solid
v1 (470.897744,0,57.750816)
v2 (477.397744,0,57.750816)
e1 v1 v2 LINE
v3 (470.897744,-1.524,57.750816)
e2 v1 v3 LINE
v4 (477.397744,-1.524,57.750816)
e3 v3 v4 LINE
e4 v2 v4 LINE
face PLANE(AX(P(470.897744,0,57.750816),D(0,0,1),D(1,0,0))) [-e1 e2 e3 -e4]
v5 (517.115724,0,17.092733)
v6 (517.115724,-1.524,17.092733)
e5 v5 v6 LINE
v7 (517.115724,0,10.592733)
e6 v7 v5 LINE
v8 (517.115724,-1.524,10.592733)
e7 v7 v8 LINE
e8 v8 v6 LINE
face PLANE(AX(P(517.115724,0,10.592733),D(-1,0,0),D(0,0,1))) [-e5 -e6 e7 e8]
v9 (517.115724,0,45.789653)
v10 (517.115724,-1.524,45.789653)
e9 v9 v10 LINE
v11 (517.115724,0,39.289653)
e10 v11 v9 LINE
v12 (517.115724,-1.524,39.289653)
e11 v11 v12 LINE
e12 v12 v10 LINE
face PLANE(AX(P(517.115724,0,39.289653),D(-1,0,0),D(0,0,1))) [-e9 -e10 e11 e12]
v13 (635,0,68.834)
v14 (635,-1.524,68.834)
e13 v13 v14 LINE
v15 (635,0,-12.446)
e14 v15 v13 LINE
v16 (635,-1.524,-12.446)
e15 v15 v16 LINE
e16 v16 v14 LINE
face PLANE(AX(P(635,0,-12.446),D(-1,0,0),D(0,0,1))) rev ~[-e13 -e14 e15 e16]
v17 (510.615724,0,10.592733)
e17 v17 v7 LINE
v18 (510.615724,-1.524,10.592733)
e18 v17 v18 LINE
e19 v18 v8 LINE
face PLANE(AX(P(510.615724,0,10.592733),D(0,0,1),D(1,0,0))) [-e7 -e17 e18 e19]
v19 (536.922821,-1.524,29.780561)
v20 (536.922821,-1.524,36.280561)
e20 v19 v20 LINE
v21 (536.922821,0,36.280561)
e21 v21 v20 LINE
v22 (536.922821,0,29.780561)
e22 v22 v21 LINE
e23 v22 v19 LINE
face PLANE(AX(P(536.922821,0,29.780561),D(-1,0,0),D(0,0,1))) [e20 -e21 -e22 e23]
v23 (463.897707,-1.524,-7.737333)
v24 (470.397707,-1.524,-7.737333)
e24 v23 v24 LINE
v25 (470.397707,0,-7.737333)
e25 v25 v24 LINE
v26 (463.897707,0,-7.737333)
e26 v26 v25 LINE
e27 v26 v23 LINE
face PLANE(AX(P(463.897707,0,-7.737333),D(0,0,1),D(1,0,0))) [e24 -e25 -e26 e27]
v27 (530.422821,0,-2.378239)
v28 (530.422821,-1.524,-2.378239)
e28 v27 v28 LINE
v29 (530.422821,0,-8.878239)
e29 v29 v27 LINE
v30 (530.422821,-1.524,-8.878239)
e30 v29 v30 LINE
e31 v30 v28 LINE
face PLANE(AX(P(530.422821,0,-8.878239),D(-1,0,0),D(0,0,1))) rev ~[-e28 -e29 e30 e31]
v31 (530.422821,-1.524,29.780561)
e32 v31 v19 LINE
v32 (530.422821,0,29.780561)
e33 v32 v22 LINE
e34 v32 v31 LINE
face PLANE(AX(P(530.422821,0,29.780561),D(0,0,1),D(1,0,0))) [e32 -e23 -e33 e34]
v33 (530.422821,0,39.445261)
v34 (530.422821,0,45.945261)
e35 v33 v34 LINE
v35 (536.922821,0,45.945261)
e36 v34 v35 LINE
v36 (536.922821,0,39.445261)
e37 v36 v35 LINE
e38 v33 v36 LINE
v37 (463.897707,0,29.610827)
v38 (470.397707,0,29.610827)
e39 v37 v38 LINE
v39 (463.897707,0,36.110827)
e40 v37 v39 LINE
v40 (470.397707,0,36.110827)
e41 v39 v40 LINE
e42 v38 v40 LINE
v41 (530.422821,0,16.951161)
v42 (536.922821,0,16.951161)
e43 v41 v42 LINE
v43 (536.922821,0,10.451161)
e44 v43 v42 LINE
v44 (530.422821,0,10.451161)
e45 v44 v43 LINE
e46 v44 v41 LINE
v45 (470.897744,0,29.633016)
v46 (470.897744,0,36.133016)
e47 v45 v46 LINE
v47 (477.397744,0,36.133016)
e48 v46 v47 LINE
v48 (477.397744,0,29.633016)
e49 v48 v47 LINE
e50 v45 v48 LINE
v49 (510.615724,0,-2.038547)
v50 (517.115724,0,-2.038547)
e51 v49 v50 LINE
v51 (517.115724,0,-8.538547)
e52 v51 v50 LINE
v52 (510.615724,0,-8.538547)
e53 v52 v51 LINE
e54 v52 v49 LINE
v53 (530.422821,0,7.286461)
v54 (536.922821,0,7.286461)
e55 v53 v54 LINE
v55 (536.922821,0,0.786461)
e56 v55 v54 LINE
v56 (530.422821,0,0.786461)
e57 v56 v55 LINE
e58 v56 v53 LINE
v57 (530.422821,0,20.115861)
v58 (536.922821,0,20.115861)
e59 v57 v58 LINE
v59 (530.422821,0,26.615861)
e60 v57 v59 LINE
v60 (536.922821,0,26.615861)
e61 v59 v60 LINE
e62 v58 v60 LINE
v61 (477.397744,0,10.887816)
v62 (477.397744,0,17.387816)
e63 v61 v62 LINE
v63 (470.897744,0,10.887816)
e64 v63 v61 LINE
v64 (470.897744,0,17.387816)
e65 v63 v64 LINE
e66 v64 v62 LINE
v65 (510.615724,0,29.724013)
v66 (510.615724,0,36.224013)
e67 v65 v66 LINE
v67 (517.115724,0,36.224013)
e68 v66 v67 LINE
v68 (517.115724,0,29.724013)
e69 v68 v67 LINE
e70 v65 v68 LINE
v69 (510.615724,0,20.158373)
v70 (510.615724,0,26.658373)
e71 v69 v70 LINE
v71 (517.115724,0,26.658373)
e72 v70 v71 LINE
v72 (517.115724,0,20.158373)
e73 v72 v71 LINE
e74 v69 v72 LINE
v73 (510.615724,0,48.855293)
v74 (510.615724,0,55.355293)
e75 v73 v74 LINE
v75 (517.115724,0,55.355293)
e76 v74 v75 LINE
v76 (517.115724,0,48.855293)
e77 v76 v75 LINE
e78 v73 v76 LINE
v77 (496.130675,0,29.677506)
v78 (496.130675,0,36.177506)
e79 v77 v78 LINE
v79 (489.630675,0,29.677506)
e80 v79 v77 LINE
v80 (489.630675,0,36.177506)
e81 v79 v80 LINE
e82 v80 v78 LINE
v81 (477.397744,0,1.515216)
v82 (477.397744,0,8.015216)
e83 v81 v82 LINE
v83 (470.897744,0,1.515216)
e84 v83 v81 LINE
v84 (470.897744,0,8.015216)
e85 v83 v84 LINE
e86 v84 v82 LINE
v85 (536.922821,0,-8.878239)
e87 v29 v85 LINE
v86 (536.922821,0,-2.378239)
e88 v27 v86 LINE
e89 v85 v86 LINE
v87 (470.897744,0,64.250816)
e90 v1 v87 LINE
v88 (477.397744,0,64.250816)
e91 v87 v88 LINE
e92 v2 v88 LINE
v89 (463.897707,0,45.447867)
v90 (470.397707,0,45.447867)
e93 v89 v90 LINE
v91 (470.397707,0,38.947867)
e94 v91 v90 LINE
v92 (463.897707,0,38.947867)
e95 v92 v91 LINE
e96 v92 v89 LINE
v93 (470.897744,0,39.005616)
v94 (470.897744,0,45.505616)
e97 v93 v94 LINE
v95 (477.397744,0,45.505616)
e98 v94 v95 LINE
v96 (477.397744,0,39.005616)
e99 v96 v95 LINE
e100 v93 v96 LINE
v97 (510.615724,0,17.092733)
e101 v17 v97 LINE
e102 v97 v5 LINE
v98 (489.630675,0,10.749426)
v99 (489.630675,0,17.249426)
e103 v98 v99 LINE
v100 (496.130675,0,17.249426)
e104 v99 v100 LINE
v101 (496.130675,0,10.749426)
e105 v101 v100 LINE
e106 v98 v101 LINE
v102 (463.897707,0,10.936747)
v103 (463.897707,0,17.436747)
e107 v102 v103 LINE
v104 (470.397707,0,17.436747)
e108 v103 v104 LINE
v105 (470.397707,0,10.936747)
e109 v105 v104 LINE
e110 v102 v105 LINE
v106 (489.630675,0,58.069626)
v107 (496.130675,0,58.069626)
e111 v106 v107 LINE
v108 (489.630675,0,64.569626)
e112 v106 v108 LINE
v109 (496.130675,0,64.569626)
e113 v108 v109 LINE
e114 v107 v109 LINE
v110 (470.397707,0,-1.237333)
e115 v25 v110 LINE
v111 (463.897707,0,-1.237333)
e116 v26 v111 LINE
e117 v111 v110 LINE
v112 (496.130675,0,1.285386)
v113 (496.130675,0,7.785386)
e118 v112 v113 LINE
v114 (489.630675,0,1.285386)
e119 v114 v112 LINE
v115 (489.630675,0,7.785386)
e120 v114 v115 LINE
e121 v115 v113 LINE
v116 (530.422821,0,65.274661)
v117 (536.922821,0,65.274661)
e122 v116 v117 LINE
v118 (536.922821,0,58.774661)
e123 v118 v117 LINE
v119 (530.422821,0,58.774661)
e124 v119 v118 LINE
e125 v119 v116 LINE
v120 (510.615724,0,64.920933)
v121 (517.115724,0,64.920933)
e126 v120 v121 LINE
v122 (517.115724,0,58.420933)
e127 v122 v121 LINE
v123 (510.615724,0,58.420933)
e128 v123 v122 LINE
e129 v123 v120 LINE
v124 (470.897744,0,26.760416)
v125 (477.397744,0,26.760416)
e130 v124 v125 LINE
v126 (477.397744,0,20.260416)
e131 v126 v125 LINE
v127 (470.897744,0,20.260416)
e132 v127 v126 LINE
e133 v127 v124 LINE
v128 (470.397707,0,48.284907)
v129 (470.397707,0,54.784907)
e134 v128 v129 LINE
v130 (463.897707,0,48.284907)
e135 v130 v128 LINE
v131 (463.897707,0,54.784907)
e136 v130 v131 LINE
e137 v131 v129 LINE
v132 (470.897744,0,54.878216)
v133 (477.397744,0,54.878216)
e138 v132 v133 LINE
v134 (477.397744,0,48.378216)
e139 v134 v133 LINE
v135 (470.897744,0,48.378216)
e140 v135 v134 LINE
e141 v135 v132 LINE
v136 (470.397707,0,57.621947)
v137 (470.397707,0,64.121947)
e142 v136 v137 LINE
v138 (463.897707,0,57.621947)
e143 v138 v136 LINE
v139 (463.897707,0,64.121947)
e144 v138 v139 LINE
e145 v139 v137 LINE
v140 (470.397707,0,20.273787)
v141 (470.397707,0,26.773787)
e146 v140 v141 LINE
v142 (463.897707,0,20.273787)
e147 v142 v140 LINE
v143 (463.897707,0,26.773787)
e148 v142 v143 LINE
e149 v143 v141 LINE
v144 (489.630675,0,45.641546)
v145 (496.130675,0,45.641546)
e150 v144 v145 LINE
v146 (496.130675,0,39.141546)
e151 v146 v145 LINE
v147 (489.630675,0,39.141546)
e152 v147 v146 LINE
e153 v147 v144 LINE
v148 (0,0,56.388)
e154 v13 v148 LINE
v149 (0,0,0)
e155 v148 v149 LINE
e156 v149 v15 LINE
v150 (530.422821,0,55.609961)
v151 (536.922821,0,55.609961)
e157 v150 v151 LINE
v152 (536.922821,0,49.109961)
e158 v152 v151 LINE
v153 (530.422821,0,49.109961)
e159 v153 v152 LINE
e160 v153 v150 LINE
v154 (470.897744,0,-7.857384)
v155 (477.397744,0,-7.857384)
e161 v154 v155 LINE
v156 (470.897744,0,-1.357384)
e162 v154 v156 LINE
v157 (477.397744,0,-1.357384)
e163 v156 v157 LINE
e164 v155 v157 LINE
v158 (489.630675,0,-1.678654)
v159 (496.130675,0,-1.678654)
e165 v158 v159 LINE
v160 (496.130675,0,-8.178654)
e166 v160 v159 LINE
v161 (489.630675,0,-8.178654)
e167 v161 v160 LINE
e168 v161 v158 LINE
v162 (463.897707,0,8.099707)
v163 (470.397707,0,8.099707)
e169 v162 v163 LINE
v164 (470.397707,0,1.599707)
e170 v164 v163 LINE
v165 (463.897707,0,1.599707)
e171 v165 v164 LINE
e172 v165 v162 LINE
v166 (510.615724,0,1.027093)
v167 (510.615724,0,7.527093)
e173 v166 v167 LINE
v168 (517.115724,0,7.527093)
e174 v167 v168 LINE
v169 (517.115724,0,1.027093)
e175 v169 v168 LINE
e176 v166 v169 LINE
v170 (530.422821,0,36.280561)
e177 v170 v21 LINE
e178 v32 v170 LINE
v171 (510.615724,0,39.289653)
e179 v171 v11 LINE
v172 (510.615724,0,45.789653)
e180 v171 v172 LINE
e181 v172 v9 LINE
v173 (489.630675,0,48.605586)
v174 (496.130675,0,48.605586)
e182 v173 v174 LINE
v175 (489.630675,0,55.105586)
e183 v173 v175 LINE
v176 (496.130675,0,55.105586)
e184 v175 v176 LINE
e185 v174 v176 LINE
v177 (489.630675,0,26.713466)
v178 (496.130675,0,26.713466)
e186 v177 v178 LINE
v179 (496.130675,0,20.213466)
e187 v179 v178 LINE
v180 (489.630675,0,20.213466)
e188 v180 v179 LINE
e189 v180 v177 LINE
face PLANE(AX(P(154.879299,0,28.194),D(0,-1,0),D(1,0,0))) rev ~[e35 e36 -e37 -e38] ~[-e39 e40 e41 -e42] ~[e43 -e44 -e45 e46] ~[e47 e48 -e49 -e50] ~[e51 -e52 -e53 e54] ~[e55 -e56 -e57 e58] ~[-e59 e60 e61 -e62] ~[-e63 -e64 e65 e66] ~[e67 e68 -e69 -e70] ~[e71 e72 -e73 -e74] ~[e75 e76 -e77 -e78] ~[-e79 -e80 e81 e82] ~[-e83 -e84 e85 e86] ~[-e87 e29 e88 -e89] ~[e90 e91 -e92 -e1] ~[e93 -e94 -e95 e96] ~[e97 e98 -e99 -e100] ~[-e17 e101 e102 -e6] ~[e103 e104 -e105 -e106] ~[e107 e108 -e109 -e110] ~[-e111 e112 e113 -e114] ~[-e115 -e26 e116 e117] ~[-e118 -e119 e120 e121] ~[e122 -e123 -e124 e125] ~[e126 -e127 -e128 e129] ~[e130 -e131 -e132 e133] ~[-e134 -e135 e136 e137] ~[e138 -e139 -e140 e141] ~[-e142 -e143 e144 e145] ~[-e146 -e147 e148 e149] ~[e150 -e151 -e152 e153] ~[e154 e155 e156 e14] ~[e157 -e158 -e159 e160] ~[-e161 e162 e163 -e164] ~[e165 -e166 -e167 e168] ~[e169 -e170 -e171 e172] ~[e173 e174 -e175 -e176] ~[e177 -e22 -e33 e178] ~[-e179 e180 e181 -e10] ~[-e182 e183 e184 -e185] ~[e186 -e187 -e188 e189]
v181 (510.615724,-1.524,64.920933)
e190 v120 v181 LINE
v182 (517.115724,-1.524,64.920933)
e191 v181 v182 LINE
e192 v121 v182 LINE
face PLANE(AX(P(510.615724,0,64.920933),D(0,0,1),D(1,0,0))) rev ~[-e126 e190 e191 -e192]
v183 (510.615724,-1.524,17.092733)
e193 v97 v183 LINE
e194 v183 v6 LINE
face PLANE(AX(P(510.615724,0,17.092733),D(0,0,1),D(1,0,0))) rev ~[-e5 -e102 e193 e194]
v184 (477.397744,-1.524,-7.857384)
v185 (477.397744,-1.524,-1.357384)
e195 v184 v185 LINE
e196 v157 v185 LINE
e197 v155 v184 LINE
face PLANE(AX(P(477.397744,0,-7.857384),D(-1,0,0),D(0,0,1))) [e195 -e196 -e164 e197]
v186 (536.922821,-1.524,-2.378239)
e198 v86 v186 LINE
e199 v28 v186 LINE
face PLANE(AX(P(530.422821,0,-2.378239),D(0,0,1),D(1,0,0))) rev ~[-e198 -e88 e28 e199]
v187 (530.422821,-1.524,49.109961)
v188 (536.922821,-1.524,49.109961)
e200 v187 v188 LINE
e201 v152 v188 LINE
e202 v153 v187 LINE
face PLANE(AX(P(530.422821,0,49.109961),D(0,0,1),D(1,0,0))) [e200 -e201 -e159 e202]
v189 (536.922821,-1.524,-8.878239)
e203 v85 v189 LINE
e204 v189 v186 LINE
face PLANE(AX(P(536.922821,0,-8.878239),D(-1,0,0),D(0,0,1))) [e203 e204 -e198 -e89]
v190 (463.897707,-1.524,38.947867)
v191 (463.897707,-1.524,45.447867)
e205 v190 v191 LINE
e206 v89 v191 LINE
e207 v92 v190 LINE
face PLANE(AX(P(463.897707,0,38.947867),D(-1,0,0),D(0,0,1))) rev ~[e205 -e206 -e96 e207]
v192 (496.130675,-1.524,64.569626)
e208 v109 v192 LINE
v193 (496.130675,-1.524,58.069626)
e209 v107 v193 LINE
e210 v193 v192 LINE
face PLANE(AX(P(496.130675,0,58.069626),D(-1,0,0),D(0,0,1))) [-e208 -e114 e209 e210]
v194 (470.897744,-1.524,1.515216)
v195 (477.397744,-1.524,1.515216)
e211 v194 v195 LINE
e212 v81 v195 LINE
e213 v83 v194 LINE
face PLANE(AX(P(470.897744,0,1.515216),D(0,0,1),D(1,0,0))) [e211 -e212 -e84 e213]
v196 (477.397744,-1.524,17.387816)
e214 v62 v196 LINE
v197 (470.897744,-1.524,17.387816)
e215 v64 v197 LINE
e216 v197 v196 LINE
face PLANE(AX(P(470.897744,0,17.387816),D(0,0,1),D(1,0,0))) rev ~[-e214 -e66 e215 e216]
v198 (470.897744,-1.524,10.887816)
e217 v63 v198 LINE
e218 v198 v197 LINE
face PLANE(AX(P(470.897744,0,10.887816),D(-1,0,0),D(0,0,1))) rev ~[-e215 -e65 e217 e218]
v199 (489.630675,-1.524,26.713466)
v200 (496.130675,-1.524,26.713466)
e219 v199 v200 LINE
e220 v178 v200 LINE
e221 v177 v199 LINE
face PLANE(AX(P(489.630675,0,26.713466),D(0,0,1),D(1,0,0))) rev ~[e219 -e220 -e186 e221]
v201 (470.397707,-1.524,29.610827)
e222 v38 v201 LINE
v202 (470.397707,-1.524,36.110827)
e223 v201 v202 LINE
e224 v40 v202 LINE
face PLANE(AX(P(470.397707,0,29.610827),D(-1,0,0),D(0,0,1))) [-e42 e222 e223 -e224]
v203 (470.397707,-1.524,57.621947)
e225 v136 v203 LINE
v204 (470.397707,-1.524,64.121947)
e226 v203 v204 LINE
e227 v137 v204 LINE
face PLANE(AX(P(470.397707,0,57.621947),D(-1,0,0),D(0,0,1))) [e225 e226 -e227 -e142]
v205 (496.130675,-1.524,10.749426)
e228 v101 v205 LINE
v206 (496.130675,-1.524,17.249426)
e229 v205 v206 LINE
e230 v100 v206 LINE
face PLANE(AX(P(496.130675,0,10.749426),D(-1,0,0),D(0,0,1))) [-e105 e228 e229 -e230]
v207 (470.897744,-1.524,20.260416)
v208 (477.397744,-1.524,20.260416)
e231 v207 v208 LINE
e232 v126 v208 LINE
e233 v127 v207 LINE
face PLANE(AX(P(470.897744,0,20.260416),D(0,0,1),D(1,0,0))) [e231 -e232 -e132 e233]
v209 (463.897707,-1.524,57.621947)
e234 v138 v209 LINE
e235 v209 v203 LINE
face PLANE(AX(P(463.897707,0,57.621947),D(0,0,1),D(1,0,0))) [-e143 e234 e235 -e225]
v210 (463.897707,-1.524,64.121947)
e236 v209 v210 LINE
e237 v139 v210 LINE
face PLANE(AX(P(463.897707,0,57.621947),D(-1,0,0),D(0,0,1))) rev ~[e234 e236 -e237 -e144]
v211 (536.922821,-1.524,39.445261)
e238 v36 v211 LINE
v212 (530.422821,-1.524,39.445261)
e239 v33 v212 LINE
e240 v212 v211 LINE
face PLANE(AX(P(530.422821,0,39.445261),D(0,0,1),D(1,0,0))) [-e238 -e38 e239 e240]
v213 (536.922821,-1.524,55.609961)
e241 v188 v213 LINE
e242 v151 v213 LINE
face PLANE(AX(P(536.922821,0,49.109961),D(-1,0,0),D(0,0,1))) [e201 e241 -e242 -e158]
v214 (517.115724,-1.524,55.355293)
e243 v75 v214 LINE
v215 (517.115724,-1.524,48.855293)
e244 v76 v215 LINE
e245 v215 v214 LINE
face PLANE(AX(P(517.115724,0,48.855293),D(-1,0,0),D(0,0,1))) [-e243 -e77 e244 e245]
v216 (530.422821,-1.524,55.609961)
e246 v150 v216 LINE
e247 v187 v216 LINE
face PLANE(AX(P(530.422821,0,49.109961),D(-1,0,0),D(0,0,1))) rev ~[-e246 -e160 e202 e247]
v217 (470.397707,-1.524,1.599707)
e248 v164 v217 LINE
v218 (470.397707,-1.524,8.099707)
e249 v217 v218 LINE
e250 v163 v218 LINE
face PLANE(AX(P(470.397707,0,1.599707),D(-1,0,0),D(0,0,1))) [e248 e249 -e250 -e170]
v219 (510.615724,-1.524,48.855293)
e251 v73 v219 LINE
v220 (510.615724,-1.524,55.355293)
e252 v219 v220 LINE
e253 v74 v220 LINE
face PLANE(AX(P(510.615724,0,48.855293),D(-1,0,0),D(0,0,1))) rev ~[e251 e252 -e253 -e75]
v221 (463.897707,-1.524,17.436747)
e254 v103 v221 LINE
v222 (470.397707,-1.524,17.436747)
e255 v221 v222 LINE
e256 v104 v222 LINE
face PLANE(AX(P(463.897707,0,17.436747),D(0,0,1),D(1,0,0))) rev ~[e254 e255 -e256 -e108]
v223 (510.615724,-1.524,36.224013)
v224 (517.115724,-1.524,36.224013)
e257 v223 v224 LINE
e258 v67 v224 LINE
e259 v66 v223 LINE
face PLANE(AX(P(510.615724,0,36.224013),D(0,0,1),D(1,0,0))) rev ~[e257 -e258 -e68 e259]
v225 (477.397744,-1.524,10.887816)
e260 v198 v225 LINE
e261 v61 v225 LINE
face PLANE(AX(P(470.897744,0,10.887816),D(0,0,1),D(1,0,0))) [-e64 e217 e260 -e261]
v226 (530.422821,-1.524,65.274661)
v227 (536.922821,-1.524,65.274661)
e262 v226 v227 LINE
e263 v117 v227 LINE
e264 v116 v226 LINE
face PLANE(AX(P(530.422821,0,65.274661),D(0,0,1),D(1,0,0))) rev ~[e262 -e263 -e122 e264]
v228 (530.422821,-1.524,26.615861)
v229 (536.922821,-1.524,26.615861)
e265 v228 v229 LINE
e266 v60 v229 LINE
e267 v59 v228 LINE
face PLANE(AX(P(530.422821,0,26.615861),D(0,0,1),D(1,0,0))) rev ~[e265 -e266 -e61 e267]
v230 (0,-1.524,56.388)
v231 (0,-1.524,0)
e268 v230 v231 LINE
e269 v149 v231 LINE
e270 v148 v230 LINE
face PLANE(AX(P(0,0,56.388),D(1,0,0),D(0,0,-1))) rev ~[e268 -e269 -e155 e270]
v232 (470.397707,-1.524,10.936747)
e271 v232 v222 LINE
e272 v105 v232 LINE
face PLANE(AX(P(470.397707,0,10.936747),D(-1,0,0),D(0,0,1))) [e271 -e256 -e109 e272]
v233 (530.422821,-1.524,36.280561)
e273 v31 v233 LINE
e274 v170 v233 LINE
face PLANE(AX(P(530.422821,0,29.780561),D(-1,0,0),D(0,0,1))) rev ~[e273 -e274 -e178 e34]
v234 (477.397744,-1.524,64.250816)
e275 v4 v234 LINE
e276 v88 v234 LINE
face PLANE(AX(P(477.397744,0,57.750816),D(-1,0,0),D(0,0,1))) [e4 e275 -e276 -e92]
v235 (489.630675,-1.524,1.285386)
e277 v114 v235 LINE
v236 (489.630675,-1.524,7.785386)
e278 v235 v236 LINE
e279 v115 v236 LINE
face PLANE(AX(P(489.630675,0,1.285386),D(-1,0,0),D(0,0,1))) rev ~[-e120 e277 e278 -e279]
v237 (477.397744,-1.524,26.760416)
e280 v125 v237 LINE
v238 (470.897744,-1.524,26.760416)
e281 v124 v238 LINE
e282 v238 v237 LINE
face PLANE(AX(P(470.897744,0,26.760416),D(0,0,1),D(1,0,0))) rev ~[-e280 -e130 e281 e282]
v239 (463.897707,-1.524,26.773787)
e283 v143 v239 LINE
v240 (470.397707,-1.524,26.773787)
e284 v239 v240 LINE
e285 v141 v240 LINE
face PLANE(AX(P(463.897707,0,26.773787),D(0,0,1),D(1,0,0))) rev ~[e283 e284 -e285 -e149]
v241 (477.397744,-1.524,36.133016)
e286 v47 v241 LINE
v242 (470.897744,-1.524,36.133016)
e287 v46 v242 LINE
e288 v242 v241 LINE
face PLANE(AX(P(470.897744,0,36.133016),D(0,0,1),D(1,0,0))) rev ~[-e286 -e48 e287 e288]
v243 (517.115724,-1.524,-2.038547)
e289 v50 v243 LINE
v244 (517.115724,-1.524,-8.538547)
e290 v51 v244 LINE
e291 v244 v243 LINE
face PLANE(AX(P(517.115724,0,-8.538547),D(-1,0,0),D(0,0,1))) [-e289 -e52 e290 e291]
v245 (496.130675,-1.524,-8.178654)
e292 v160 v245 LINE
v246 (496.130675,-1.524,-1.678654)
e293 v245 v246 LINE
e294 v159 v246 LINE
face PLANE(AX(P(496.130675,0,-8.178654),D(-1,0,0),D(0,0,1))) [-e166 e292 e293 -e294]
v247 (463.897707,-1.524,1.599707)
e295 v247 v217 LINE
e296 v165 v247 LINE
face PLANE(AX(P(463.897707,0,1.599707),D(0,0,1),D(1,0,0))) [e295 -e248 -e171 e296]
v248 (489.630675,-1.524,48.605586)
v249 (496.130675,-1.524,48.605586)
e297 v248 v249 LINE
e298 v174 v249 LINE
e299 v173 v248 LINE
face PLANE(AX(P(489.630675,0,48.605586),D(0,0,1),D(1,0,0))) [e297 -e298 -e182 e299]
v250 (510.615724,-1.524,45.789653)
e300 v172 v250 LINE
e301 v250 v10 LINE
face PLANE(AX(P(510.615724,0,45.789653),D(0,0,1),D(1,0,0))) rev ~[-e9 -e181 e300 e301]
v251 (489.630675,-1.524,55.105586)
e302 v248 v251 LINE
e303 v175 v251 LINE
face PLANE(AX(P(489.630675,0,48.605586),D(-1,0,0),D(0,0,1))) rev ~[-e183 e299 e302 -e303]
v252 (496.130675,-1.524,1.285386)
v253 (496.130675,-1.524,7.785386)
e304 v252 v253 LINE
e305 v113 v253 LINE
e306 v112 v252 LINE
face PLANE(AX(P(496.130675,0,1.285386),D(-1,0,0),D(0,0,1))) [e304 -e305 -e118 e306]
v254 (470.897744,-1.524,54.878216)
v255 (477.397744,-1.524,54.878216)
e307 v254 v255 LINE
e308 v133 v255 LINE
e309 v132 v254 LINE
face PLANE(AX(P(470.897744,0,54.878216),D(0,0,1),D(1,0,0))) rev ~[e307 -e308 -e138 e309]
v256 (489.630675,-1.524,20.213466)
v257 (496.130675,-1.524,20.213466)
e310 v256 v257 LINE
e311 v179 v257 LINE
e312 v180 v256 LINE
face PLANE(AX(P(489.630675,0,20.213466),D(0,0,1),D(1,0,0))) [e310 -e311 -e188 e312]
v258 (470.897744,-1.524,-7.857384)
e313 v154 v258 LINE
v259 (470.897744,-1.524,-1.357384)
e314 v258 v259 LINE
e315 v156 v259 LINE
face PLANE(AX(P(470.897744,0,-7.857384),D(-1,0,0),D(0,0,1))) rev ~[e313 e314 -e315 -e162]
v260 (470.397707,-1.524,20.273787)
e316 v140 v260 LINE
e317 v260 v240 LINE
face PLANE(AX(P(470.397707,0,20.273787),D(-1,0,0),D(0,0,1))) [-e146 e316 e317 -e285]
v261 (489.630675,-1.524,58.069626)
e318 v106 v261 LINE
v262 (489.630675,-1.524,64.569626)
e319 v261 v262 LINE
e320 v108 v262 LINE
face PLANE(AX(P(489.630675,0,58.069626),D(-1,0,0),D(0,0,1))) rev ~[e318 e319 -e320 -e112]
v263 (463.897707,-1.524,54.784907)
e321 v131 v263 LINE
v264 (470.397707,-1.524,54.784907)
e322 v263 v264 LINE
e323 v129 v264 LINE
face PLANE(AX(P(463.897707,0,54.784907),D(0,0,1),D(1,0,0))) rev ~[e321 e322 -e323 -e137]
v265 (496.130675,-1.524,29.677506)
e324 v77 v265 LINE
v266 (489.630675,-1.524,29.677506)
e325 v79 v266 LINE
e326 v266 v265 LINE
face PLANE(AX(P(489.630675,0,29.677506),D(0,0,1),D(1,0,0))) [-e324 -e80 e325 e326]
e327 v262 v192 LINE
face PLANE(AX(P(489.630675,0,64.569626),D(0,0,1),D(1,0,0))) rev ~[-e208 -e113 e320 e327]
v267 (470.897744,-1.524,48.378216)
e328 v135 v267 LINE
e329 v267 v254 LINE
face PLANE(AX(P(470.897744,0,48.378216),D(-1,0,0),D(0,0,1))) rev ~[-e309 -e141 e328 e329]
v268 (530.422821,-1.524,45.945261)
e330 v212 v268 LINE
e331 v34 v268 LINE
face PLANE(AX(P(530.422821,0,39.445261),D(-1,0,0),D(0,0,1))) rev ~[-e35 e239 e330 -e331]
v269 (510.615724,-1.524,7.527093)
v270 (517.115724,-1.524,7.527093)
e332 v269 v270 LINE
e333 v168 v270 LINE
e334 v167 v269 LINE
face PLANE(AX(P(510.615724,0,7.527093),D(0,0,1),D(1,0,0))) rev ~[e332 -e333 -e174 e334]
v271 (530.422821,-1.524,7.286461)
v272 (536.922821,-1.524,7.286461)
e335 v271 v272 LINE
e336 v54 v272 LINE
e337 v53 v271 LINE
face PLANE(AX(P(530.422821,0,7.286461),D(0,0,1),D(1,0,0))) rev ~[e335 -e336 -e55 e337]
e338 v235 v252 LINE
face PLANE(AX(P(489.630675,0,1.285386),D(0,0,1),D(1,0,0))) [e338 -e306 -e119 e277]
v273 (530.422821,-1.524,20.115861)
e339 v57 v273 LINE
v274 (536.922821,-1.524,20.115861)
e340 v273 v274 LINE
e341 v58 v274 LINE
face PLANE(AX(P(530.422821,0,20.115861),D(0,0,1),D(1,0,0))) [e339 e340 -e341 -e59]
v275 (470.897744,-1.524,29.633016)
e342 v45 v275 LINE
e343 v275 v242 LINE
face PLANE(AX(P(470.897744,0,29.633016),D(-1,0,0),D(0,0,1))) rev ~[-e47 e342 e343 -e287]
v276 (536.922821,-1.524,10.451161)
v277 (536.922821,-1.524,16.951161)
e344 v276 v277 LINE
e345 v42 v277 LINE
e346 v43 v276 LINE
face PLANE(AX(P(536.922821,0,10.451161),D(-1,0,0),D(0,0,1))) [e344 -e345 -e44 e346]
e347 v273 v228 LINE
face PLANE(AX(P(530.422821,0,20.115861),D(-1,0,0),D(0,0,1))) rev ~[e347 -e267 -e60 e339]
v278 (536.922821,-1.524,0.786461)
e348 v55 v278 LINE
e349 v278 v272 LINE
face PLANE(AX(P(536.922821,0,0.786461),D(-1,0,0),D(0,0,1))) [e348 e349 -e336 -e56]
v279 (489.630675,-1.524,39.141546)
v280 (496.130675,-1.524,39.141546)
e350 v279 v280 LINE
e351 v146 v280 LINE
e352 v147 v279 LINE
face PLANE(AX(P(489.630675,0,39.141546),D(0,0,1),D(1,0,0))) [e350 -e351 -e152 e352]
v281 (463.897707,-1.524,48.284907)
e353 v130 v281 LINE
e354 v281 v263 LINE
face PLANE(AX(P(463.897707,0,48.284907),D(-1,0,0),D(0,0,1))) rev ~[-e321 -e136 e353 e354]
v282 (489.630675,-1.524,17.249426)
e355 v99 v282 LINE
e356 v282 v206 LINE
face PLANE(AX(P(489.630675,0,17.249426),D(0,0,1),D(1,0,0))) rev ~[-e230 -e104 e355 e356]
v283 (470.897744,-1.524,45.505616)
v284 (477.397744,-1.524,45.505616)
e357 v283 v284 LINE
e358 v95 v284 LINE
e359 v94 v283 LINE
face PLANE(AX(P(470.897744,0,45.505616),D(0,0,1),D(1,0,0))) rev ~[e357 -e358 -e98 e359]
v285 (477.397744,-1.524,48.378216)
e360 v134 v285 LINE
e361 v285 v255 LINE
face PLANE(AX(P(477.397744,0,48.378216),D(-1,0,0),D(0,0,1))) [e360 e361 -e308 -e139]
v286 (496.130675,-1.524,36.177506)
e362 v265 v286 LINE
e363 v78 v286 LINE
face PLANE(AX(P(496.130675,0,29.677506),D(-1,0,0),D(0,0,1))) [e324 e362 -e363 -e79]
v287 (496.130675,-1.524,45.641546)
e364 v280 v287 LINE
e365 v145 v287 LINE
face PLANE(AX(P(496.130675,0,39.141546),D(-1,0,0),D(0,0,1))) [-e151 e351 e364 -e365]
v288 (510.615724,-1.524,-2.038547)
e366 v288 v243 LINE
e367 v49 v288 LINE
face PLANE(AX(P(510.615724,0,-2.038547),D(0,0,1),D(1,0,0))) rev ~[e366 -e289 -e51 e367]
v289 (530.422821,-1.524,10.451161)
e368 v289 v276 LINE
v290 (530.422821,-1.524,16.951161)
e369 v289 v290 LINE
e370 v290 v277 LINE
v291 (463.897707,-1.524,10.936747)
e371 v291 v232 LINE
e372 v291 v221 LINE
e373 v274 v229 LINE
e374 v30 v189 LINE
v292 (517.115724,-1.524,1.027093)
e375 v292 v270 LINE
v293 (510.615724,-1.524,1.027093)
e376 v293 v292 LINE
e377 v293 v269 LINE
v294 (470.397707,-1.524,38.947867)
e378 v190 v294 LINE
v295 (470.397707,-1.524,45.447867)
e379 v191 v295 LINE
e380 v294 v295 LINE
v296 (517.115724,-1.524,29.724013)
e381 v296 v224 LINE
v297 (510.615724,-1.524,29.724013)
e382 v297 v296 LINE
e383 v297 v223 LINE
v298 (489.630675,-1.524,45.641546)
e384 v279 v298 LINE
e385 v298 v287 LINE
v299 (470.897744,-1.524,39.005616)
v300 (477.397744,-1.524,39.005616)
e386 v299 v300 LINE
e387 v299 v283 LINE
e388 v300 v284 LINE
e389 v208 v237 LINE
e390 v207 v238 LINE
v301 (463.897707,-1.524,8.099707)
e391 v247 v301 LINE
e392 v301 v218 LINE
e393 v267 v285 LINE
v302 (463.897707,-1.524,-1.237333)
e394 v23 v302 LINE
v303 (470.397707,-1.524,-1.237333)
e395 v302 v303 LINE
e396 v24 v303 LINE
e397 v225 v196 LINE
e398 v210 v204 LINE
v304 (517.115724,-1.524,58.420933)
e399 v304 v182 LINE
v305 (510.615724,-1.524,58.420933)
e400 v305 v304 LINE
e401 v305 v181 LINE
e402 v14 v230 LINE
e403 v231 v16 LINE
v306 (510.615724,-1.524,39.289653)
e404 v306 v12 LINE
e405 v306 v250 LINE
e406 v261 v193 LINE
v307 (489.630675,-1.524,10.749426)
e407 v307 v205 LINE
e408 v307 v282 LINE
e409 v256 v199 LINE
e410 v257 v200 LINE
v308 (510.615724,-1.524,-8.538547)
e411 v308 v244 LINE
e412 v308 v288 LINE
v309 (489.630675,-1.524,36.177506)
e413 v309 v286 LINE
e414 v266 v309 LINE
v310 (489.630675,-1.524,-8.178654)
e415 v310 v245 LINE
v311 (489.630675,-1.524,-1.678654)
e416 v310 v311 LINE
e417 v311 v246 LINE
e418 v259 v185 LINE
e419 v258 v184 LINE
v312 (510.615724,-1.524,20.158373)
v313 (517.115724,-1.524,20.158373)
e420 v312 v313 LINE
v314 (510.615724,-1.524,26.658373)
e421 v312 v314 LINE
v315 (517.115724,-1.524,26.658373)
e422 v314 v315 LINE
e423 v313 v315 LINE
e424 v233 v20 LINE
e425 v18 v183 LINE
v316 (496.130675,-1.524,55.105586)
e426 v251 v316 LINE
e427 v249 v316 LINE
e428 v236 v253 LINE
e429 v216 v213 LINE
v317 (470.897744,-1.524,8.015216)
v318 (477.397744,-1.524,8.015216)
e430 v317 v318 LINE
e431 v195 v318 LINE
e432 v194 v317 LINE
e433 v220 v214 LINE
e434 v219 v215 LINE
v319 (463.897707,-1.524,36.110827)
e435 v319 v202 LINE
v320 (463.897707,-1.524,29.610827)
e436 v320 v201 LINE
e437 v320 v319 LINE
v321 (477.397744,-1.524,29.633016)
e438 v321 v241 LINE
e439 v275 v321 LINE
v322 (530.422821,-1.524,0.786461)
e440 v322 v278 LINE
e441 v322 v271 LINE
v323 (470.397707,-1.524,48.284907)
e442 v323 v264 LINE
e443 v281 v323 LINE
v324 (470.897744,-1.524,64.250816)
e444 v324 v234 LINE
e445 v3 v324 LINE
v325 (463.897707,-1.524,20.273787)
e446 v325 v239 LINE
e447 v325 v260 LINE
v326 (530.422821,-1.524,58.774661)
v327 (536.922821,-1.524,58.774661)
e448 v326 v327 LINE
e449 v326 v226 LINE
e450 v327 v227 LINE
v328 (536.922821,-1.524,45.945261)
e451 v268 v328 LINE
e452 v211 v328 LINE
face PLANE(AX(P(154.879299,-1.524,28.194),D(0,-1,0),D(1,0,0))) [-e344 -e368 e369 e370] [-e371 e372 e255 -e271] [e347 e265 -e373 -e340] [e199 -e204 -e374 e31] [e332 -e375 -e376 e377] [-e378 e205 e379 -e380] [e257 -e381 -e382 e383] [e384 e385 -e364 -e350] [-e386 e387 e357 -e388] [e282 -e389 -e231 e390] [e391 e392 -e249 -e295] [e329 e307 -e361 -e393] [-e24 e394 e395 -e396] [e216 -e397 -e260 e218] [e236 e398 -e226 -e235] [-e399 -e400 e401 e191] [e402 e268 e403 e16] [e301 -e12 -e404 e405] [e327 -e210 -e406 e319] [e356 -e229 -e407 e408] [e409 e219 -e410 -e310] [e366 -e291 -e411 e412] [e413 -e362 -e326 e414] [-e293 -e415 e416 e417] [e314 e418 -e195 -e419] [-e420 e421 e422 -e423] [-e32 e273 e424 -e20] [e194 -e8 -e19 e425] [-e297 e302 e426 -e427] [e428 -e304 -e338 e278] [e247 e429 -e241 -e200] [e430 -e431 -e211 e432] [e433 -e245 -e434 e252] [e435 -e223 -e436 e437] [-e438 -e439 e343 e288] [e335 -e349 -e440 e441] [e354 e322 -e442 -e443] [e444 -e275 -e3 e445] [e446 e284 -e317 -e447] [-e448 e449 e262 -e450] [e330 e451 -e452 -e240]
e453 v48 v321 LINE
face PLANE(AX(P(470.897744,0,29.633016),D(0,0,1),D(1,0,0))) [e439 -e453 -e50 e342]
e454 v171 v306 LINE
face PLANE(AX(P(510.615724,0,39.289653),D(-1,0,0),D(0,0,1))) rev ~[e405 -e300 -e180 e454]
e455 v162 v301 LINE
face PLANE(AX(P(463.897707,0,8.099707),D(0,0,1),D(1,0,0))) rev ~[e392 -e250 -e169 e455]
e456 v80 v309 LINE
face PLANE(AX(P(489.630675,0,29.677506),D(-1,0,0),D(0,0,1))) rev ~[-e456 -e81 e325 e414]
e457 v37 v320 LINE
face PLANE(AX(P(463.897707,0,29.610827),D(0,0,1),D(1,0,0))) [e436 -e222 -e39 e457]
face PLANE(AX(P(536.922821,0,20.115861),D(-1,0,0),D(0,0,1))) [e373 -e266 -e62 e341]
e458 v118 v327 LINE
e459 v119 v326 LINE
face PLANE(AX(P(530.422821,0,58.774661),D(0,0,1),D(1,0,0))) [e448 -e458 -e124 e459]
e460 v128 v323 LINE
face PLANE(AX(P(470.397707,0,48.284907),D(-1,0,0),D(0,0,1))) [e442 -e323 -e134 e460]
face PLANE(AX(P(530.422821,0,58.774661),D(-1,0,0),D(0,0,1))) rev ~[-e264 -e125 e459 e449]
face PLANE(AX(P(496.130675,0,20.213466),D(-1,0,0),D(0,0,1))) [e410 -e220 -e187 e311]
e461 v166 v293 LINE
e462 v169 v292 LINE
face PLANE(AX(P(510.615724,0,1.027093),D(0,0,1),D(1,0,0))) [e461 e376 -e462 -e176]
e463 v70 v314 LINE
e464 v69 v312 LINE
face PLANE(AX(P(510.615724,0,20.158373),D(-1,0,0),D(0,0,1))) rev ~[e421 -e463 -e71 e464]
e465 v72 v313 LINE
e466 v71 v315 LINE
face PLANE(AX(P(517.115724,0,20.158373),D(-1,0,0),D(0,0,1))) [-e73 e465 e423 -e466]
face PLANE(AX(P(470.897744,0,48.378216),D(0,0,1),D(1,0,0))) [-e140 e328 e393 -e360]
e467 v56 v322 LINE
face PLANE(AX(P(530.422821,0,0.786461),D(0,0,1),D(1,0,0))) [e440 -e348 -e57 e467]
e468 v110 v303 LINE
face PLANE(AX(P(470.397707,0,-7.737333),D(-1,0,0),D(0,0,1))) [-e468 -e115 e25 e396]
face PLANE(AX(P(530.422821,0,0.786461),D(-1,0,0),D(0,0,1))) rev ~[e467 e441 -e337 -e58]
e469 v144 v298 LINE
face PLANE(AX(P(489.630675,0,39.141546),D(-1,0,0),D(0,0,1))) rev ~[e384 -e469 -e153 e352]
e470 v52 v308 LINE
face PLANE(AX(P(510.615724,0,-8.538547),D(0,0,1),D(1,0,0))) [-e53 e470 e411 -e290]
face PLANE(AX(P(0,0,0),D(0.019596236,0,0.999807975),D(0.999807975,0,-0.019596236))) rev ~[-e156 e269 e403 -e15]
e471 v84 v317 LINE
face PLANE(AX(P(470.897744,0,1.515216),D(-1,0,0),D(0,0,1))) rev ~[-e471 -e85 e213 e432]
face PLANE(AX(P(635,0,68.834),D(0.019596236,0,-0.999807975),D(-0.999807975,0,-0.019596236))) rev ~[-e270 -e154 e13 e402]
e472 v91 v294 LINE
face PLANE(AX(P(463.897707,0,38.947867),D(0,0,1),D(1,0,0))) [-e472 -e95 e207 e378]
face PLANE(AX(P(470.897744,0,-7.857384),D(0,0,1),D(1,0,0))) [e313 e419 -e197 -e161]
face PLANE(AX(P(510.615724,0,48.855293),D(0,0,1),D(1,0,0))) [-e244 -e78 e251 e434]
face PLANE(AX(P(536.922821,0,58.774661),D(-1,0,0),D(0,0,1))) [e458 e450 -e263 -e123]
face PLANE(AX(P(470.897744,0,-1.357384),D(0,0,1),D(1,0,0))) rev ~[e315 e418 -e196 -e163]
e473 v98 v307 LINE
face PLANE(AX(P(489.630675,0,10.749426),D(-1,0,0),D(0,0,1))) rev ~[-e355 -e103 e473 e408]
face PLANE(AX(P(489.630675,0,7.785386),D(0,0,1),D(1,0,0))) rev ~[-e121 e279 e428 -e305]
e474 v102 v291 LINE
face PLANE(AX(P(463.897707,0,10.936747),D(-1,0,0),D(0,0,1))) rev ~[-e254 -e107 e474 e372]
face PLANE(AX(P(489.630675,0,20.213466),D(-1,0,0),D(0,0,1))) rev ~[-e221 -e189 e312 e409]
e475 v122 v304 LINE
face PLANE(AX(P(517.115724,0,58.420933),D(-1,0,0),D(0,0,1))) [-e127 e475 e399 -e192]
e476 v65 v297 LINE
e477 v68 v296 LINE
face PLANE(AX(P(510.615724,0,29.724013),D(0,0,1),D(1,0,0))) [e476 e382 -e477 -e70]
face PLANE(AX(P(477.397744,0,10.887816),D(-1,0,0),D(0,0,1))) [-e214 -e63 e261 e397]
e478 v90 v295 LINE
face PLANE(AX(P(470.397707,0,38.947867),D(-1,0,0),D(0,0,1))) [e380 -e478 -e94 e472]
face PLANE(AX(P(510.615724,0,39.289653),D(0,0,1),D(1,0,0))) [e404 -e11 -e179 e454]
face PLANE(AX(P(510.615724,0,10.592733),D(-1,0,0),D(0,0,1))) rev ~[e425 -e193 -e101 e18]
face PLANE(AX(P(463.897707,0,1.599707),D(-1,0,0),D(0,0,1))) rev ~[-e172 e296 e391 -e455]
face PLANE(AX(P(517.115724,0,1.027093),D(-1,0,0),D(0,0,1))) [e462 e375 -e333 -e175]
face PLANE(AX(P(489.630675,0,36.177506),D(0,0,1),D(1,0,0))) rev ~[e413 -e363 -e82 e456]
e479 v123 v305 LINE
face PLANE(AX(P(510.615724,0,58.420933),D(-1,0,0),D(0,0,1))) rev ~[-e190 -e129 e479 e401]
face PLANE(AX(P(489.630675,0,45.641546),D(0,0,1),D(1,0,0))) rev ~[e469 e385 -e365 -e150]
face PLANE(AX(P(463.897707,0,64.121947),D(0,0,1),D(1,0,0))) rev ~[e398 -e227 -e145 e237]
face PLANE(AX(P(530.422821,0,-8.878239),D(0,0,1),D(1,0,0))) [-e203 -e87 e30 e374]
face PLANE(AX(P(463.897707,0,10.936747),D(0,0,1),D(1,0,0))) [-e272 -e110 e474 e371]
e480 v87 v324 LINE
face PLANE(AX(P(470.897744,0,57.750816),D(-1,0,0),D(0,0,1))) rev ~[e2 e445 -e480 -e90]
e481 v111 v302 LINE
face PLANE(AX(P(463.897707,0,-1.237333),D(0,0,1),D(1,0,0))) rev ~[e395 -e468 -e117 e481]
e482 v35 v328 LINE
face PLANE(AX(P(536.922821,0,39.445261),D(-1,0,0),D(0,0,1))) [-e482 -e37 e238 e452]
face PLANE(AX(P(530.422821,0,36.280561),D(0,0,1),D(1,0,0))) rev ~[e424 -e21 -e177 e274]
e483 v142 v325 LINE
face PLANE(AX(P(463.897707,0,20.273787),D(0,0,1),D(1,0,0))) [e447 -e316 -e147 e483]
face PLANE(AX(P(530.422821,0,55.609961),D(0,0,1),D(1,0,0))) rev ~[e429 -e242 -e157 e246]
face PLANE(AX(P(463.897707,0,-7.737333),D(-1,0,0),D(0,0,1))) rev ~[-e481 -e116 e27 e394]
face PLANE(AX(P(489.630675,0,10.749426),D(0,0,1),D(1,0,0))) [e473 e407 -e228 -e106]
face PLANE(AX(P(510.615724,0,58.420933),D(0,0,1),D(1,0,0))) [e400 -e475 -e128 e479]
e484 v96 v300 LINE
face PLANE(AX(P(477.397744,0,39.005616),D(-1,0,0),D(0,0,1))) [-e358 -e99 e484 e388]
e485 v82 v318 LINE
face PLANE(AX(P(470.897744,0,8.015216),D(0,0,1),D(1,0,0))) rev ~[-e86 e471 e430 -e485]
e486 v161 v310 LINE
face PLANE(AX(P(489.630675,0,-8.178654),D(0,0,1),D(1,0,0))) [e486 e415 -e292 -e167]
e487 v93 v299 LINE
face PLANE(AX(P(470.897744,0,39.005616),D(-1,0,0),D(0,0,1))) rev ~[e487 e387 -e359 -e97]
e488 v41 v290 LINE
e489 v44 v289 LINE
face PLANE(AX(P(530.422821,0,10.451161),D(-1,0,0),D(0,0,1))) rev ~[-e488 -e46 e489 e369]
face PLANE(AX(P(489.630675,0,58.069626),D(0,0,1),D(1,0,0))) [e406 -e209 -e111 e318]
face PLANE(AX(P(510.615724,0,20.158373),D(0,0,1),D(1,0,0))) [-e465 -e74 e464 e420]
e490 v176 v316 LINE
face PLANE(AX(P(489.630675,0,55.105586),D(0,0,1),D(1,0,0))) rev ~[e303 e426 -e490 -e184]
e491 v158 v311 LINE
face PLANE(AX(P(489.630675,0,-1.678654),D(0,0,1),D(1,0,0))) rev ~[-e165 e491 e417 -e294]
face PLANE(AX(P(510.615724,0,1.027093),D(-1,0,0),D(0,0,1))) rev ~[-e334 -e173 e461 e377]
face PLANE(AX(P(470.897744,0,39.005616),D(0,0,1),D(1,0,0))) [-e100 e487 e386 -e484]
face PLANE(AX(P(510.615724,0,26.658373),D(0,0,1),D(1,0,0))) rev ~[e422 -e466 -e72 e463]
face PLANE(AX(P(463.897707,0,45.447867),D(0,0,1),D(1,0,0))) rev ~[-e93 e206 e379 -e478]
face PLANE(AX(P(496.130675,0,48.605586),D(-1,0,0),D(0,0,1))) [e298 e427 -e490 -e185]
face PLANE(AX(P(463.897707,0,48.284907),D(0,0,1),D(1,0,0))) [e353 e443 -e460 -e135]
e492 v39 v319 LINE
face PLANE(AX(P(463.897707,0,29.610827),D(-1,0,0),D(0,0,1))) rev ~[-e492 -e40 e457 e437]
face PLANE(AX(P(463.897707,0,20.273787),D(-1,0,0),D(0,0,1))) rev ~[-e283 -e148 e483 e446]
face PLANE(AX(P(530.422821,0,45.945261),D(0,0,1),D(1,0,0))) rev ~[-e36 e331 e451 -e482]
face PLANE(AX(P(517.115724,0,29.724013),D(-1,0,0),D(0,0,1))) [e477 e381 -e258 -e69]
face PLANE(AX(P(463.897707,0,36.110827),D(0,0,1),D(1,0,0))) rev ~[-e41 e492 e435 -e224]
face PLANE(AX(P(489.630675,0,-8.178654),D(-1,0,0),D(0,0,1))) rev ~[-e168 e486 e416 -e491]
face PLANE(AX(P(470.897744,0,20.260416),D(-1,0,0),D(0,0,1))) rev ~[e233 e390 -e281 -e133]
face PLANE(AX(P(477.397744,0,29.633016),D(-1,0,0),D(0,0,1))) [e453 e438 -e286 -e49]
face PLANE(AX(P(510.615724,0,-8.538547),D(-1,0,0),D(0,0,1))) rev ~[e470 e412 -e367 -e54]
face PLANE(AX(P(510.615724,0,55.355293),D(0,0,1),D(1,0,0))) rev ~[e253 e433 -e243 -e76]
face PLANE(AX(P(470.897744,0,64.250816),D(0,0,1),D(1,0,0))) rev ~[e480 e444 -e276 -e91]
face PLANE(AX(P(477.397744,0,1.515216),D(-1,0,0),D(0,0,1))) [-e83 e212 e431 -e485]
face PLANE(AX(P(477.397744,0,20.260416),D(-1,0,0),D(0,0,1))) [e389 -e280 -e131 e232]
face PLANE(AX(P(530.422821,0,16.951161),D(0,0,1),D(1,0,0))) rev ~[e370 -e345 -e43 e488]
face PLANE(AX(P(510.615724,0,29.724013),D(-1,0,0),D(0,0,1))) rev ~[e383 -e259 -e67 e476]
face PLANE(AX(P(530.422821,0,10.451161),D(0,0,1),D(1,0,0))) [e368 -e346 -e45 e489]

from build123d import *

# Parameters (mm, degrees)
F0_W     = 6.5
F0_H     = 6.5
F1_DEPTH = 1.524
F3_R     = 1.1303
F4_DEPTH = 972


# Not quite as in the source:
# - an extrude ends at something that could not be found from the text; its depth is read off the source's solid


with BuildPart() as f1:
    # F0 (on Front) → F1 (new body)
    with BuildSketch(Plane.XZ):
        Polygon((0, 56.388), (0, 0), (304.8, -5.97408), (304.8, 62.36208), align=None)
        Polygon((304.8, 62.36208), (304.8, -5.97408), (635, -12.446), (635, 68.834), align=None)
        with Locations((467.1477068, -4.4873331716)):
            Rectangle(F0_W, F0_H, mode=Mode.SUBTRACT)
        with Locations((474.1477436, -4.6073838027)):
            Rectangle(F0_W, F0_H, mode=Mode.SUBTRACT)
        with Locations((467.1477068, 4.8497068284)):
            Rectangle(F0_W, F0_H, mode=Mode.SUBTRACT)
        with Locations((474.1477436, 4.7652161973)):
            Rectangle(F0_W, F0_H, mode=Mode.SUBTRACT)
        with Locations((492.8806754, -4.9286535831)):
            Rectangle(F0_W, F0_H, mode=Mode.SUBTRACT)
        with Locations((513.8657236, -5.2885471597)):
            Rectangle(F0_W, F0_H, mode=Mode.SUBTRACT)
        with Locations((533.6728214, -5.628238887)):
            Rectangle(F0_W, F0_H, mode=Mode.SUBTRACT)
        with Locations((492.8806754, 4.5353864169)):
            Rectangle(F0_W, F0_H, mode=Mode.SUBTRACT)
        with Locations((513.8657236, 4.2770928403)):
            Rectangle(F0_W, F0_H, mode=Mode.SUBTRACT)
        with Locations((533.6728214, 4.036461113)):
            Rectangle(F0_W, F0_H, mode=Mode.SUBTRACT)
        with Locations((467.1477068, 14.1867468284)):
            Rectangle(F0_W, F0_H, mode=Mode.SUBTRACT)
        with Locations((474.1477436, 14.1378161973)):
            Rectangle(F0_W, F0_H, mode=Mode.SUBTRACT)
        with Locations((467.1477068, 23.5237868284)):
            Rectangle(F0_W, F0_H, mode=Mode.SUBTRACT)
        with Locations((474.1477436, 23.5104161973)):
            Rectangle(F0_W, F0_H, mode=Mode.SUBTRACT)
        with Locations((492.8806754, 13.9994264169)):
            Rectangle(F0_W, F0_H, mode=Mode.SUBTRACT)
        with Locations((513.8657236, 13.8427328403)):
            Rectangle(F0_W, F0_H, mode=Mode.SUBTRACT)
        with Locations((533.6728214, 13.701161113)):
            Rectangle(F0_W, F0_H, mode=Mode.SUBTRACT)
        with Locations((492.8806754, 23.4634664169)):
            Rectangle(F0_W, F0_H, mode=Mode.SUBTRACT)
        with Locations((513.8657236, 23.4083728403)):
            Rectangle(F0_W, F0_H, mode=Mode.SUBTRACT)
        with Locations((533.6728214, 23.365861113)):
            Rectangle(F0_W, F0_H, mode=Mode.SUBTRACT)
        with Locations((467.1477068, 32.8608268284)):
            Rectangle(F0_W, F0_H, mode=Mode.SUBTRACT)
        with Locations((474.1477436, 32.8830161973)):
            Rectangle(F0_W, F0_H, mode=Mode.SUBTRACT)
        with Locations((467.1477068, 42.1978668284)):
            Rectangle(F0_W, F0_H, mode=Mode.SUBTRACT)
        with Locations((474.1477436, 42.2556161973)):
            Rectangle(F0_W, F0_H, mode=Mode.SUBTRACT)
        with Locations((492.8806754, 32.9275064169)):
            Rectangle(F0_W, F0_H, mode=Mode.SUBTRACT)
        with Locations((513.8657236, 32.9740128403)):
            Rectangle(F0_W, F0_H, mode=Mode.SUBTRACT)
        with Locations((533.6728214, 33.030561113)):
            Rectangle(F0_W, F0_H, mode=Mode.SUBTRACT)
        with Locations((492.8806754, 42.3915464169)):
            Rectangle(F0_W, F0_H, mode=Mode.SUBTRACT)
        with Locations((513.8657236, 42.5396528403)):
            Rectangle(F0_W, F0_H, mode=Mode.SUBTRACT)
        with Locations((533.6728214, 42.695261113)):
            Rectangle(F0_W, F0_H, mode=Mode.SUBTRACT)
        with Locations((467.1477068, 51.5349068284)):
            Rectangle(F0_W, F0_H, mode=Mode.SUBTRACT)
        with Locations((474.1477436, 51.6282161973)):
            Rectangle(F0_W, F0_H, mode=Mode.SUBTRACT)
        with Locations((467.1477068, 60.8719468284)):
            Rectangle(F0_W, F0_H, mode=Mode.SUBTRACT)
        with Locations((474.1477436, 61.0008161973)):
            Rectangle(F0_W, F0_H, mode=Mode.SUBTRACT)
        with Locations((492.8806754, 51.8555864169)):
            Rectangle(F0_W, F0_H, mode=Mode.SUBTRACT)
        with Locations((513.8657236, 52.1052928403)):
            Rectangle(F0_W, F0_H, mode=Mode.SUBTRACT)
        with Locations((533.6728214, 52.359961113)):
            Rectangle(F0_W, F0_H, mode=Mode.SUBTRACT)
        with Locations((492.8806754, 61.3196264169)):
            Rectangle(F0_W, F0_H, mode=Mode.SUBTRACT)
        with Locations((513.8657236, 61.6709328403)):
            Rectangle(F0_W, F0_H, mode=Mode.SUBTRACT)
        with Locations((533.6728214, 62.024661113)):
            Rectangle(F0_W, F0_H, mode=Mode.SUBTRACT)
    extrude(amount=F1_DEPTH)

    # F3 (on face) → F4 (cut, through all)
    with BuildSketch(Plane.XZ.offset(1.524)):
        with Locations((97.3946236, 8.0847413075)):
            Circle(F3_R)
        with Locations((3.175, 8.1216754)):
            Circle(F3_R)
        with Locations((181.3279076, 8.0518394602)):
            Circle(F3_R)
        with Locations((290.391088, 8.0090866935)):
            Circle(F3_R)
        with Locations((409.2984448, 7.9624750096)):
            Circle(F3_R)
        with Locations((524.05534, 7.9174903067)):
            Circle(F3_R)
        with Locations((624.435886, 7.8781411327)):
            Circle(F3_R)
        with Locations((97.3946236, 48.3032586925)):
            Circle(F3_R)
        with Locations((3.175, 48.2663246)):
            Circle(F3_R)
        with Locations((181.3279076, 48.3361605398)):
            Circle(F3_R)
        with Locations((290.391088, 48.3789133065)):
            Circle(F3_R)
        with Locations((409.2984448, 48.4255249904)):
            Circle(F3_R)
        with Locations((524.05534, 48.4705096933)):
            Circle(F3_R)
        with Locations((624.435886, 48.5098588673)):
            Circle(F3_R)
    extrude(amount=F4_DEPTH, mode=Mode.SUBTRACT)


solid = f1.part
